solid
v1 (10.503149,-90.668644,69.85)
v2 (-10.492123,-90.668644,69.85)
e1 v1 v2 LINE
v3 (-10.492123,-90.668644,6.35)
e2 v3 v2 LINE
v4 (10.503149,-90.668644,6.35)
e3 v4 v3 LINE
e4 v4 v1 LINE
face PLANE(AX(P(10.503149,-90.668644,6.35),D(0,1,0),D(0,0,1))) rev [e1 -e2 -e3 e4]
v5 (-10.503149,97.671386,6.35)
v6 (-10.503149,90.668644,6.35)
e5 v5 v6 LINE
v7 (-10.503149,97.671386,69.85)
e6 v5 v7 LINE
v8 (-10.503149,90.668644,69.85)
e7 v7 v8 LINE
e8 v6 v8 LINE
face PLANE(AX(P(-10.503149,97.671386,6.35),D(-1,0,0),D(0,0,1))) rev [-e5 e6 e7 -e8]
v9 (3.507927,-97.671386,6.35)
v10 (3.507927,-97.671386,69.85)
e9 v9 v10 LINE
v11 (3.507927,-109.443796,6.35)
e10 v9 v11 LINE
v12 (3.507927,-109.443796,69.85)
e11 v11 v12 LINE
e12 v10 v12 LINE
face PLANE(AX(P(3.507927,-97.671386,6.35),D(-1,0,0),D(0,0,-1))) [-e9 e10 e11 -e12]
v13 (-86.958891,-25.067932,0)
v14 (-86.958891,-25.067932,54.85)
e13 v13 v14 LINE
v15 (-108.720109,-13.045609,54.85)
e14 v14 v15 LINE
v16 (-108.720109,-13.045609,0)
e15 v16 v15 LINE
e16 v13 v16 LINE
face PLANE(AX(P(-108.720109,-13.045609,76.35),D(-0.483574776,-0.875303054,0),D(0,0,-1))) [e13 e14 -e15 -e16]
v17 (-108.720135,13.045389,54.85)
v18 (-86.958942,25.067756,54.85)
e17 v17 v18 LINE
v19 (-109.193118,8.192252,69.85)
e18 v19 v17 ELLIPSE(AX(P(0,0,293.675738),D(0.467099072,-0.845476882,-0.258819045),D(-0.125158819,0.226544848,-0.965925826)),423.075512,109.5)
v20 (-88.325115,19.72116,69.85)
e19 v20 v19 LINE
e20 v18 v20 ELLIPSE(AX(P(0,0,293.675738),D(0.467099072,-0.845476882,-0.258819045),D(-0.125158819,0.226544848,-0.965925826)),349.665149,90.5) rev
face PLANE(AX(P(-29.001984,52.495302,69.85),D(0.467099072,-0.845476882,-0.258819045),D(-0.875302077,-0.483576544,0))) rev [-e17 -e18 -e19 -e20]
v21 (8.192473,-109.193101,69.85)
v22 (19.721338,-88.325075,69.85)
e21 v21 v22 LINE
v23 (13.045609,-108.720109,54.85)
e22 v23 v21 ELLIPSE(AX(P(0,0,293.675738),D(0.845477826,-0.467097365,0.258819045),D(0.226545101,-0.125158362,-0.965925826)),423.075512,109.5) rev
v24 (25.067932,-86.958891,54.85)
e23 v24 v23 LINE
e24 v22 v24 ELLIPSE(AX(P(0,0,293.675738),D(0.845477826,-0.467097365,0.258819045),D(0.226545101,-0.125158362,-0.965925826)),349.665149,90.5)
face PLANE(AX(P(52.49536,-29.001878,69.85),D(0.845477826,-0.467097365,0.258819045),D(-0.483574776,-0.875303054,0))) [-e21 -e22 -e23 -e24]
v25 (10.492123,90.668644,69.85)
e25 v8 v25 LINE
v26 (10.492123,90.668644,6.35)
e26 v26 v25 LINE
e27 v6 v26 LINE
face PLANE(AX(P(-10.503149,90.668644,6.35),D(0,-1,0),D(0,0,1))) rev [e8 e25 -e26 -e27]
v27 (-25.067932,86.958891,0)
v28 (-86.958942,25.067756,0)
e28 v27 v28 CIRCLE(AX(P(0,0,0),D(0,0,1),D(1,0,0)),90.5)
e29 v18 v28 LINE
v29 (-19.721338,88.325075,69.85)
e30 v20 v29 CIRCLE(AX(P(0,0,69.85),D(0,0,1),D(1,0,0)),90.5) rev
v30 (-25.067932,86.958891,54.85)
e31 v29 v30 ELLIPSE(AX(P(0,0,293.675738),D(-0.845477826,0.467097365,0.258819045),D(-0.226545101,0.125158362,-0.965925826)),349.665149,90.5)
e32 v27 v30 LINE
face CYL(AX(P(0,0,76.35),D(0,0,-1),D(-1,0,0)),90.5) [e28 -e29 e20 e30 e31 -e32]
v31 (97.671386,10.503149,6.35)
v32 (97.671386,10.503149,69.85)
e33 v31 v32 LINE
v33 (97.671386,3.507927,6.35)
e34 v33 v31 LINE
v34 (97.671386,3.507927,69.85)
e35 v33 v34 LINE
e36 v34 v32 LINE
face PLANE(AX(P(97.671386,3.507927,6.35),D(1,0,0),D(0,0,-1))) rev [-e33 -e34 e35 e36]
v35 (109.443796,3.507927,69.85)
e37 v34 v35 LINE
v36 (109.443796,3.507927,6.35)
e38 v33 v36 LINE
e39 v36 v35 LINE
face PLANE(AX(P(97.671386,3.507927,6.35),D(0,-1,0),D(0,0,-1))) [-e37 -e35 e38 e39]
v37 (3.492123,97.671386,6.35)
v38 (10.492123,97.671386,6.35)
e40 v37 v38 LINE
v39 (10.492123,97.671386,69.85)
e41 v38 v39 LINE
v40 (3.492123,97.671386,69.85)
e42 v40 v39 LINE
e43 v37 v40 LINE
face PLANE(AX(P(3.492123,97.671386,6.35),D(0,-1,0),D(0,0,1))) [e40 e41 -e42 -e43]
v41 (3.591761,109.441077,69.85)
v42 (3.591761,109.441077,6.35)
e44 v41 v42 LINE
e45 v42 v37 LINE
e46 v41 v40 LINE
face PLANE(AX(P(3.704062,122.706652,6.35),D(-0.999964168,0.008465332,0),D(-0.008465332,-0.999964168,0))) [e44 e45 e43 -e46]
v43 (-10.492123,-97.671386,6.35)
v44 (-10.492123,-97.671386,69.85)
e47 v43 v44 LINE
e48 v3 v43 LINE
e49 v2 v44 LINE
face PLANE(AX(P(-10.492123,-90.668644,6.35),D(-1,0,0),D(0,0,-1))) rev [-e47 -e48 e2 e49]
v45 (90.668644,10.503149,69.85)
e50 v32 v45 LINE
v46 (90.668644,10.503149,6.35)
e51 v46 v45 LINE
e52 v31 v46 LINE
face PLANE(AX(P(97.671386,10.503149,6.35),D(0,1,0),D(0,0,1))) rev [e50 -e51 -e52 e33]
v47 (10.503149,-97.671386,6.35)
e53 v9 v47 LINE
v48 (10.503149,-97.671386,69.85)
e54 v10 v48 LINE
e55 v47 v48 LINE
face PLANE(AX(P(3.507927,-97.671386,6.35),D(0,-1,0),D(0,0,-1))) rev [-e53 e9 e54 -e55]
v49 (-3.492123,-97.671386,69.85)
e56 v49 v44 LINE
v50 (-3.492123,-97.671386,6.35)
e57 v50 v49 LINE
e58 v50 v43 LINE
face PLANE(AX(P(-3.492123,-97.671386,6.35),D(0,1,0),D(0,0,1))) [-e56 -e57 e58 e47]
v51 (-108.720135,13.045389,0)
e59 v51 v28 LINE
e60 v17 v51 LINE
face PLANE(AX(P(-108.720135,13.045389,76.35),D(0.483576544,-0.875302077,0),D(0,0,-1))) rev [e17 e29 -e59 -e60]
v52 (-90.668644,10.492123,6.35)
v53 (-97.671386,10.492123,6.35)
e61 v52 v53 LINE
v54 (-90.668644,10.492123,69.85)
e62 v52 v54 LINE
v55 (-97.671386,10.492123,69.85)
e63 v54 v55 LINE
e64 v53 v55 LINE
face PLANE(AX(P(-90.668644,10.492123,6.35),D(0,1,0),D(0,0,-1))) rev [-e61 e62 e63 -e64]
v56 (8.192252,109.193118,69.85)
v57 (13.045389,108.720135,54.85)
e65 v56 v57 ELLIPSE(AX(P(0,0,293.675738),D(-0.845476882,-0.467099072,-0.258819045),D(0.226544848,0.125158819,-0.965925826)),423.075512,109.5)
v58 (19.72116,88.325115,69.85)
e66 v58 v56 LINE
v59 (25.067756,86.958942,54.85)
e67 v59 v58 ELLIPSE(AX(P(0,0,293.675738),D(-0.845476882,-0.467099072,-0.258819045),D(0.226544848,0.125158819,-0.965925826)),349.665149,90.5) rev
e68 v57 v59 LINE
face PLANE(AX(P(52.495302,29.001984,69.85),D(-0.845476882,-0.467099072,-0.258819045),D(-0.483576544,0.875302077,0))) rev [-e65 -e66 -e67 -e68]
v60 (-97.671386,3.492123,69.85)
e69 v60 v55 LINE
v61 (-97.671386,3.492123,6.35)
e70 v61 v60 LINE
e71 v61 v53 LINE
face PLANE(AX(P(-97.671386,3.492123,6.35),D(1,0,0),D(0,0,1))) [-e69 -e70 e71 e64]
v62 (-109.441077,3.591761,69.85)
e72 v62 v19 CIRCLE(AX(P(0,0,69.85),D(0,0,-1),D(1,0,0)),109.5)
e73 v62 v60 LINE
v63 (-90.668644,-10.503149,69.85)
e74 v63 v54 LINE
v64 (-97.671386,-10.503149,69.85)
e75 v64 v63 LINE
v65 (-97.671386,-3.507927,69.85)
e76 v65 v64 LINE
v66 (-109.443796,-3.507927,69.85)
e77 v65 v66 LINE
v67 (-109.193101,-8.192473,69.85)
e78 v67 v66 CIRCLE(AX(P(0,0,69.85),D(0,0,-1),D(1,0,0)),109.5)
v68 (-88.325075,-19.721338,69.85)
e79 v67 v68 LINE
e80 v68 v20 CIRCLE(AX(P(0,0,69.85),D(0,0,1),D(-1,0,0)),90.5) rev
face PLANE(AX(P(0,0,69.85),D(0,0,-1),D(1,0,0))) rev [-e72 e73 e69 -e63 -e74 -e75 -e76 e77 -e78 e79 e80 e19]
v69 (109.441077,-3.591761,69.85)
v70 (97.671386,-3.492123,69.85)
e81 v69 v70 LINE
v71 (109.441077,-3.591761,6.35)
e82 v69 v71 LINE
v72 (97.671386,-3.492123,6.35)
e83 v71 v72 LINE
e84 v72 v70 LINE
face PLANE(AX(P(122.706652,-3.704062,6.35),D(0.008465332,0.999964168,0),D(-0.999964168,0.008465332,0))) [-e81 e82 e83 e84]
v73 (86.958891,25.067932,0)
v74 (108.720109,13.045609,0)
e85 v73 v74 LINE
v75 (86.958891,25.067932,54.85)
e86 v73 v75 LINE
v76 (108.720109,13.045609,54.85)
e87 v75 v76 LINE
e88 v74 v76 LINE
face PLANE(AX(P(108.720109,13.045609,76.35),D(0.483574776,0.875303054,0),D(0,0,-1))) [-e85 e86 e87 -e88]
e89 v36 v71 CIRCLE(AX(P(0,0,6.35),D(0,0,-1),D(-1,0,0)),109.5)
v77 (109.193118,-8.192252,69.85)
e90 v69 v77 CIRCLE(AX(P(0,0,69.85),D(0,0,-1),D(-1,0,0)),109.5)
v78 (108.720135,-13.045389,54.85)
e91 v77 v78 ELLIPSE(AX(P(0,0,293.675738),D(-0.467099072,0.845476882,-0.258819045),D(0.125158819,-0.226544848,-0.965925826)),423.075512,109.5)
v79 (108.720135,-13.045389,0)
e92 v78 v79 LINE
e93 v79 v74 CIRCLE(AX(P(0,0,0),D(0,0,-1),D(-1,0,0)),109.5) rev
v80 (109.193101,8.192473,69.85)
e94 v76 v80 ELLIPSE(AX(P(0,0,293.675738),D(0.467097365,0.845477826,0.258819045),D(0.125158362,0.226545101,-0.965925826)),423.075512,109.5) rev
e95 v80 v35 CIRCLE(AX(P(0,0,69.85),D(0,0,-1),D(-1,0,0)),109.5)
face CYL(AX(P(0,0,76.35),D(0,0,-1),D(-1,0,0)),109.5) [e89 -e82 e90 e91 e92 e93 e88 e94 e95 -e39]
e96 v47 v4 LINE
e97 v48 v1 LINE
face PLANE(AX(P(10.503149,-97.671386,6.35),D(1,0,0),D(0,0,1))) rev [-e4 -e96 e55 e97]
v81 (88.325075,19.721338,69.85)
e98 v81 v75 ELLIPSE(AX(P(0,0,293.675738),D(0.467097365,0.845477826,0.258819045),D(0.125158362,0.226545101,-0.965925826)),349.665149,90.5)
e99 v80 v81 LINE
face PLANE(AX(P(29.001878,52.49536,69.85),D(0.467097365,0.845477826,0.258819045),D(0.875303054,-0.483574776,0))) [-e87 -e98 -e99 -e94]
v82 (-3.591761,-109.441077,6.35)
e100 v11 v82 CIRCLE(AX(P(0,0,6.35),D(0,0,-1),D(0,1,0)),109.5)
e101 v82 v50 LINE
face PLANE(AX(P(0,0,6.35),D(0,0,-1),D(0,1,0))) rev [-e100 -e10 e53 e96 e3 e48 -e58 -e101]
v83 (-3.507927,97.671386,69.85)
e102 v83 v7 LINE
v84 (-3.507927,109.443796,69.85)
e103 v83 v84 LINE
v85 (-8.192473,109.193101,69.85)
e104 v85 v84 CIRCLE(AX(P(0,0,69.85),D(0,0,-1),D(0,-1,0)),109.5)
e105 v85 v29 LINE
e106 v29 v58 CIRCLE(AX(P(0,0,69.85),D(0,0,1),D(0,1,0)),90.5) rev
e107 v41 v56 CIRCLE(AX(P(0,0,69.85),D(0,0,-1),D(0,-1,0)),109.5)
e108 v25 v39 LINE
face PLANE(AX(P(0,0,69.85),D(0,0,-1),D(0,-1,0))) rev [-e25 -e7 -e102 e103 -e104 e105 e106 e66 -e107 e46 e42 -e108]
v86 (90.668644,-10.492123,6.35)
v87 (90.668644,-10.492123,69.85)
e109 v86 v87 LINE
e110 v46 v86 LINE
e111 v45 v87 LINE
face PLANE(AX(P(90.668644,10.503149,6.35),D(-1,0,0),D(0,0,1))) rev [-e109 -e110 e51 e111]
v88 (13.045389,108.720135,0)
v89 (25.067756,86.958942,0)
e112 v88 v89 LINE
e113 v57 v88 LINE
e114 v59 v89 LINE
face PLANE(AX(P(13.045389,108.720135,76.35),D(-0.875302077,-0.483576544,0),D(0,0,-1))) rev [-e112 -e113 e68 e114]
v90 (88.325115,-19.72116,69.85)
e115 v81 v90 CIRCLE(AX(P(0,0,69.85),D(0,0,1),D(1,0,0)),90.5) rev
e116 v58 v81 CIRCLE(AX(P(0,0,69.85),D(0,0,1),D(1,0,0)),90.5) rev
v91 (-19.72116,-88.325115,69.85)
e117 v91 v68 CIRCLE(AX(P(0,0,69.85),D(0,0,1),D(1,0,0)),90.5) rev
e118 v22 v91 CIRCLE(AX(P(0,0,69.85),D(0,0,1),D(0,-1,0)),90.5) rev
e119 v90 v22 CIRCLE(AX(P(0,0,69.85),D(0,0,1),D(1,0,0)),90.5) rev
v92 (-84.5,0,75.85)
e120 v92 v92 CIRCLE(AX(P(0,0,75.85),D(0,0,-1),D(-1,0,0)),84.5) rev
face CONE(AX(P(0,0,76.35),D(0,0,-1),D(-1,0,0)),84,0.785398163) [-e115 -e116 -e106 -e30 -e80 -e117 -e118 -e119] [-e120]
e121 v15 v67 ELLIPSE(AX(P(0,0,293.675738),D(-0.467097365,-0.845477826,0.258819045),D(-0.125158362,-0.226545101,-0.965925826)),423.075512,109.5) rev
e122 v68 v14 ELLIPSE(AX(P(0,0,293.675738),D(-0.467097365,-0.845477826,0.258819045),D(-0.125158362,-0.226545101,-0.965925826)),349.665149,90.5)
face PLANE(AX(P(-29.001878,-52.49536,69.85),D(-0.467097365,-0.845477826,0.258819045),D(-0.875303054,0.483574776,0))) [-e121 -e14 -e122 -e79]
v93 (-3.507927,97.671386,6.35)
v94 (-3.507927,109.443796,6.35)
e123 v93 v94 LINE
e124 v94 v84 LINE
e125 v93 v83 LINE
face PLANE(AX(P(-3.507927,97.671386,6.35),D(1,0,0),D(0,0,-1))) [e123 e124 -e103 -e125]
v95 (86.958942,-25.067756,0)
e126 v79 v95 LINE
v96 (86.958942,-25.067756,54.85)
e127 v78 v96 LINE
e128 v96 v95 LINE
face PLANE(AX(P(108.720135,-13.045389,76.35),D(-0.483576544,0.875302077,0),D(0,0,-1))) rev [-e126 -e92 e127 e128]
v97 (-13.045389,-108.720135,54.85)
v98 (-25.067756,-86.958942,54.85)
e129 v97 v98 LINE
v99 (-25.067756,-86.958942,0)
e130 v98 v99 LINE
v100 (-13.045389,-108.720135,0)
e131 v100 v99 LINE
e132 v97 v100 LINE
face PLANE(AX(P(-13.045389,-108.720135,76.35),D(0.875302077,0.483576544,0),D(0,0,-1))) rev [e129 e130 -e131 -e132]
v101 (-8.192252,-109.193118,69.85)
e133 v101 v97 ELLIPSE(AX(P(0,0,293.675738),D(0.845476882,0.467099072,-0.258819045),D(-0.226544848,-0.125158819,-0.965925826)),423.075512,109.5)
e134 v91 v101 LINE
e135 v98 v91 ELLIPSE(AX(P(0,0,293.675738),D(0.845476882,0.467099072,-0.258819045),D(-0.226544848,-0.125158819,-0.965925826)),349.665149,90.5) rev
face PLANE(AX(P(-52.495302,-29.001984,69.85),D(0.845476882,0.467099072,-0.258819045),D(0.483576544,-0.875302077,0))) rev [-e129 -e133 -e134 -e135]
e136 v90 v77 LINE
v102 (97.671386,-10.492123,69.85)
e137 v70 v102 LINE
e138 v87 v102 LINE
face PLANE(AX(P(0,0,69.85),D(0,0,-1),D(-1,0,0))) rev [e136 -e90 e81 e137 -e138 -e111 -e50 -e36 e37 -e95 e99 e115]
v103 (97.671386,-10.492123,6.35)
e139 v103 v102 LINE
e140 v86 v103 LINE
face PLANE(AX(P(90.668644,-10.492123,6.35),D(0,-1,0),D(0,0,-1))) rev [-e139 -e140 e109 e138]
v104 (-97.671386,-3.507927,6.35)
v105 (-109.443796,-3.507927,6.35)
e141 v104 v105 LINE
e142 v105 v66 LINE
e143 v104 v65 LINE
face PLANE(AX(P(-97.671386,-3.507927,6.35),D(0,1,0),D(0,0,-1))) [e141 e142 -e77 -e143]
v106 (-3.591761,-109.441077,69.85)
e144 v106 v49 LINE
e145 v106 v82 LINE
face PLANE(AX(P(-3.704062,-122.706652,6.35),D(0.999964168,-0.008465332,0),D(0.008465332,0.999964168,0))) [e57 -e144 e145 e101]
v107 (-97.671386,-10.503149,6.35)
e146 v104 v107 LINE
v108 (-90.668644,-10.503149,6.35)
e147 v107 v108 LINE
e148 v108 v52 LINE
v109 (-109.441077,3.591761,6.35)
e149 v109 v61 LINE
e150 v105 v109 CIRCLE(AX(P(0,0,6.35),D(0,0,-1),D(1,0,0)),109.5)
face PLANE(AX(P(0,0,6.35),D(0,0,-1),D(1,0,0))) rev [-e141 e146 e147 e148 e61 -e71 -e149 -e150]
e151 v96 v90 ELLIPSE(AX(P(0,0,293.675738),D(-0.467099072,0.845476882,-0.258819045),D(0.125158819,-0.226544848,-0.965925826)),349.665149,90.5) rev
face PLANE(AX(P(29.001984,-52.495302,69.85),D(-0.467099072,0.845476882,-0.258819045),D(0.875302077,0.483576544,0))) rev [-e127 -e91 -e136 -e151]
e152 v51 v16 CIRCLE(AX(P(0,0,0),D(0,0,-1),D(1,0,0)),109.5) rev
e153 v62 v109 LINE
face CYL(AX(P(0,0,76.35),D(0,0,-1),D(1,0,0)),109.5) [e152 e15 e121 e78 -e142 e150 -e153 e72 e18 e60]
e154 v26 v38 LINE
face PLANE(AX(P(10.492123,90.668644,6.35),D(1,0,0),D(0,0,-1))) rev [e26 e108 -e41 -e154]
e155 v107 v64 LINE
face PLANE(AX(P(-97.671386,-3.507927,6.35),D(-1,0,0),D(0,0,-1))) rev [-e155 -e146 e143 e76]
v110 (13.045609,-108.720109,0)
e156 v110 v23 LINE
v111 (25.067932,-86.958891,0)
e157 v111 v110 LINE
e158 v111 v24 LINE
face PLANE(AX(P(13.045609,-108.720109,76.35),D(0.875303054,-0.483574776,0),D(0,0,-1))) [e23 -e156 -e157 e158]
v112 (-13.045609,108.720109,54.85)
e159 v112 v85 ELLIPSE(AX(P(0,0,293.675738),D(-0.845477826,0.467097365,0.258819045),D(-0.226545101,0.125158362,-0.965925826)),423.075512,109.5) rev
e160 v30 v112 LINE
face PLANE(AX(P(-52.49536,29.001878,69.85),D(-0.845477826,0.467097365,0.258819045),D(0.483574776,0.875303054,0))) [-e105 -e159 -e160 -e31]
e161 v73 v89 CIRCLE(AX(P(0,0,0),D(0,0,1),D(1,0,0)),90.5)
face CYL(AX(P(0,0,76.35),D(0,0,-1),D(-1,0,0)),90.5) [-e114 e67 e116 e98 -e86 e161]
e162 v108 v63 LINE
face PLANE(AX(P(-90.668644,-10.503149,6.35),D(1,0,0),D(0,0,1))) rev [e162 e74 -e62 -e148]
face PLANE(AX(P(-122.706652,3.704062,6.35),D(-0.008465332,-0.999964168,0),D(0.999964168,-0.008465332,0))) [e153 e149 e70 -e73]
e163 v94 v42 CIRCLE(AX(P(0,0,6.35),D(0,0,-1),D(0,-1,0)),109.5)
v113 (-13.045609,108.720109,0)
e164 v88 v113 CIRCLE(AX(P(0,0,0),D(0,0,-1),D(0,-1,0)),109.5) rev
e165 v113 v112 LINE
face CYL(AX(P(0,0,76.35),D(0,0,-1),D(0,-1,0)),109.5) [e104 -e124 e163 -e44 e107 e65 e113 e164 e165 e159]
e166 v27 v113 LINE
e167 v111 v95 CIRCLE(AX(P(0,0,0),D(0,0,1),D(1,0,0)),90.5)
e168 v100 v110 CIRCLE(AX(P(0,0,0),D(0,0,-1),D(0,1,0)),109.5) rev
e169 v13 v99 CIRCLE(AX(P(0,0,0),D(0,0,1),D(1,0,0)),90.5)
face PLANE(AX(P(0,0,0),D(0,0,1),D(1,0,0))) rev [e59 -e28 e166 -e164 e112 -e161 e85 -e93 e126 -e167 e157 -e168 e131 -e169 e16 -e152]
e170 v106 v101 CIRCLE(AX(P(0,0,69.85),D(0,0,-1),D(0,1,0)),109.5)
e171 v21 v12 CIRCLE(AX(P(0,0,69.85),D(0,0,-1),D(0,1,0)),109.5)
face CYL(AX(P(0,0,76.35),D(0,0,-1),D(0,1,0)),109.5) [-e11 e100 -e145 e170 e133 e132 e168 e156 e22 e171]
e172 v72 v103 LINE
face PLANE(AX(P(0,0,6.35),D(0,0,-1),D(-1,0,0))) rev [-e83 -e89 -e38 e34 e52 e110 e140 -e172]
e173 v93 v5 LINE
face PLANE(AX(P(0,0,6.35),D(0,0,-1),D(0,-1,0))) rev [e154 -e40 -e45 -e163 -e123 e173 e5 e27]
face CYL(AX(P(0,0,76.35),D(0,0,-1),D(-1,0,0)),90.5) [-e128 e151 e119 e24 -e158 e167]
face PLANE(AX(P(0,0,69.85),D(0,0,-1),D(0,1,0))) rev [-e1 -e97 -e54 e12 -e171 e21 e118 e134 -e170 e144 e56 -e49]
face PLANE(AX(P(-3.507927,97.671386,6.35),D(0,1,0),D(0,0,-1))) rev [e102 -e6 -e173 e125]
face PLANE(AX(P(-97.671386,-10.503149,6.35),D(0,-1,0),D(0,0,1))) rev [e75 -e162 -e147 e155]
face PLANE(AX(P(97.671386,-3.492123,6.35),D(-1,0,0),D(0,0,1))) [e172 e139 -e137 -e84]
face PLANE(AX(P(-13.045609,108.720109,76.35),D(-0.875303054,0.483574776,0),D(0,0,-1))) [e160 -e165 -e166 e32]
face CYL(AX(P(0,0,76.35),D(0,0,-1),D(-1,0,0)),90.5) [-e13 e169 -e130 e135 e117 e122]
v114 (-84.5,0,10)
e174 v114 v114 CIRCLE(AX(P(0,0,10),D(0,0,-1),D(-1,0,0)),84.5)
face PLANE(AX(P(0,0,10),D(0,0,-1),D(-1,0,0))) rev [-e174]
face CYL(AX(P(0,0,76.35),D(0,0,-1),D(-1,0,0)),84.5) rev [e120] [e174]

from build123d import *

# Parameters (mm, degrees)
SKETCH1_R           = 90.5
SKETCH1_R_2         = 84.5
BOSS_EXTRUDE1_DEPTH = 76.35
CHAMFER1_SIZE       = 6.5
WRAP12_SECTION_W    = 19
WRAP12_SECTION_H    = 69.85
WRAP12_ANGLE        = 32.161608832
CUT_EXTRUDE1_DEPTH  = 63.5
CHAMFER2_SIZE       = 19
CHAMFER5_SIZE       = 15
CHAMFER5_SIZE_2     = 4.019237886
CIRPATTERN6_COUNT   = 4
SKETCH15_R          = 84.5
BOSS_EXTRUDE2_DEPTH = 10


with BuildPart() as part:
    # Sketch1 → Boss-Extrude1 (new body)
    with BuildSketch(Plane.XY):
        Circle(SKETCH1_R)
        Circle(SKETCH1_R_2, mode=Mode.SUBTRACT)
    extrude(amount=BOSS_EXTRUDE1_DEPTH)

    # Chamfer1
    # the kernel refuses this chamfer: 6.5 mm, written as the material it takes off along each edge
    with BuildSketch(Plane(origin=(0, 0, 76.35), x_dir=(1, 0, 0), z_dir=(0, -1, 0))) as chamfer1_piece_1:
        Polygon((90.5, -CHAMFER1_SIZE), (90.5 - CHAMFER1_SIZE, 0), (90.5, 0), align=None)
    revolve(axis=Axis((0, 0, 76.35), (0, 0, 1)), mode=Mode.SUBTRACT)

    # Wrap12 section (on wrap section) → Wrap12 (revolve)
    with BuildSketch(Plane(origin=(0, 0, 0), x_dir=(0.9608717281441653, 0.276993722046629, 0), z_dir=(-0.276993722046629, 0.9608717281441653, 0))):
        with Locations((100, -34.925)):
            Rectangle(WRAP12_SECTION_W, WRAP12_SECTION_H)
    revolve(axis=Axis((0, 0, 0), (0, 0, -1)), revolution_arc=WRAP12_ANGLE)

    # Sketch12 → Cut-Extrude1 (cut)
    with BuildSketch(Plane.XY.offset(69.85)):
        Polygon((122.706651928, -0.201195148), (122.706651928, 3.507927311), (97.67138598, 3.507927311), (97.67138598, 10.503148948), (90.66864355, 10.503148948), (90.66864355, -10.492123054), (97.67138598, -10.492123054), (97.67138598, -3.492123054), (122.706651928, -3.70406248), align=None)
    extrude(amount=-CUT_EXTRUDE1_DEPTH, mode=Mode.SUBTRACT)

    # Chamfer2
    # the kernel refuses this chamfer: 19 mm, written as the material it takes off along each edge
    with BuildSketch(Plane(origin=(105.215515497, -30.330600038, 118.711976771), x_dir=(-0.9608722876451651, 0.27699178116967144, 0), z_dir=(0, 0, -1))) as chamfer2_piece_1_section:
        with BuildLine():
            Line((CHAMFER2_SIZE, 0), (1.420369251, 17.579630749))
            ThreePointArc((1.420369251, 17.579630749), (0.375784571, 9.063973019), (0, 0))
            Line((0, 0), (CHAMFER2_SIZE, 0))
        make_face()
    chamfer2_piece_1 = extrude(amount=167.573953543, mode=Mode.PRIVATE)
    chamfer2_piece_1 = chamfer2_piece_1 - Plane(origin=(0, 0, 118.711976771), x_dir=(1, 0, 0), z_dir=(0, 0, -1)) * Cylinder(90.5, 412, mode=Mode.PRIVATE)
    add(chamfer2_piece_1, mode=Mode.SUBTRACT)
    with BuildSketch(Plane(origin=(105.215454232, 30.330812564, 118.711976771), x_dir=(-0.9608717281441654, -0.2769937220466291, 0), z_dir=(0, 0, -1))) as chamfer2_piece_2_section:
        with BuildLine():
            Line((CHAMFER2_SIZE, 0), (1.420369251, -17.579630749))
            ThreePointArc((1.420369251, -17.579630749), (0.375784571, -9.063973019), (0, 0))
            Line((0, 0), (CHAMFER2_SIZE, 0))
        make_face()
    chamfer2_piece_2 = extrude(amount=167.573953543, mode=Mode.PRIVATE)
    chamfer2_piece_2 = chamfer2_piece_2 - Plane(origin=(0, 0, 118.711976771), x_dir=(1, 0, 0), z_dir=(0, 0, -1)) * Cylinder(90.5, 412, mode=Mode.PRIVATE)
    add(chamfer2_piece_2, mode=Mode.SUBTRACT)

    # Chamfer5
    # the kernel refuses this chamfer: 15, 4.019237886 mm, written as the material it takes off along each edge
    with BuildSketch(Plane(origin=(52.865116584, 43.903567605, 69.85), x_dir=(0, 0, -1), z_dir=(0.8753030540266438, -0.483574775615551, 0))) as chamfer5_piece_1_section:
        Polygon((CHAMFER5_SIZE, 0), (0, -CHAMFER5_SIZE_2), (0, 0), align=None)
    chamfer5_piece_1 = extrude(amount=102.762999332, mode=Mode.PRIVATE)
    chamfer5_piece_1 = chamfer5_piece_1 - Plane(origin=(0, 0, 69.85), x_dir=(1, 0, 0), z_dir=(0, 0, -1)) * Cylinder(90.5, 266, mode=Mode.PRIVATE)
    add(chamfer5_piece_1, mode=Mode.SUBTRACT)
    with BuildSketch(Plane(origin=(52.865205265, -43.903460822, 69.85), x_dir=(0, 0, -1), z_dir=(0.8753020772463168, 0.48357654364979585, 0))) as chamfer5_piece_2_section:
        Polygon((CHAMFER5_SIZE, 0), (0, CHAMFER5_SIZE_2), (0, 0), align=None)
    chamfer5_piece_2 = extrude(amount=102.762999332, mode=Mode.PRIVATE)
    chamfer5_piece_2 = chamfer5_piece_2 - Plane(origin=(0, 0, 69.85), x_dir=(1, 0, 0), z_dir=(0, 0, -1)) * Cylinder(90.5, 266, mode=Mode.PRIVATE)
    add(chamfer5_piece_2, mode=Mode.SUBTRACT)


with BuildPart() as cirpattern6_1:
    # CirPattern6: pattern copy
    add(part.part.rotate(Axis((0, 0, 0), (0, 0, 1)), 1 * 360 / CIRPATTERN6_COUNT))


with BuildPart() as cirpattern6_2:
    # CirPattern6: pattern copy
    add(part.part.rotate(Axis((0, 0, 0), (0, 0, 1)), 2 * 360 / CIRPATTERN6_COUNT))


with BuildPart() as cirpattern6_3:
    # CirPattern6: pattern copy
    add(part.part.rotate(Axis((0, 0, 0), (0, 0, 1)), 3 * 360 / CIRPATTERN6_COUNT))


with BuildPart() as part_1:
    add(part.part)

    add(cirpattern6_1.part)  # Boss-Extrude2 merges CirPattern6_1

    add(cirpattern6_2.part)  # Boss-Extrude2 merges CirPattern6_2

    add(cirpattern6_3.part)  # Boss-Extrude2 merges CirPattern6_3
    # Sketch15 → Boss-Extrude2 (add)
    with BuildSketch(Plane(origin=(0, 0, 0), x_dir=(-1, 0, 0), z_dir=(0, 0, -1))):
        Circle(SKETCH15_R)
    extrude(amount=-BOSS_EXTRUDE2_DEPTH)


solid = part_1.part
